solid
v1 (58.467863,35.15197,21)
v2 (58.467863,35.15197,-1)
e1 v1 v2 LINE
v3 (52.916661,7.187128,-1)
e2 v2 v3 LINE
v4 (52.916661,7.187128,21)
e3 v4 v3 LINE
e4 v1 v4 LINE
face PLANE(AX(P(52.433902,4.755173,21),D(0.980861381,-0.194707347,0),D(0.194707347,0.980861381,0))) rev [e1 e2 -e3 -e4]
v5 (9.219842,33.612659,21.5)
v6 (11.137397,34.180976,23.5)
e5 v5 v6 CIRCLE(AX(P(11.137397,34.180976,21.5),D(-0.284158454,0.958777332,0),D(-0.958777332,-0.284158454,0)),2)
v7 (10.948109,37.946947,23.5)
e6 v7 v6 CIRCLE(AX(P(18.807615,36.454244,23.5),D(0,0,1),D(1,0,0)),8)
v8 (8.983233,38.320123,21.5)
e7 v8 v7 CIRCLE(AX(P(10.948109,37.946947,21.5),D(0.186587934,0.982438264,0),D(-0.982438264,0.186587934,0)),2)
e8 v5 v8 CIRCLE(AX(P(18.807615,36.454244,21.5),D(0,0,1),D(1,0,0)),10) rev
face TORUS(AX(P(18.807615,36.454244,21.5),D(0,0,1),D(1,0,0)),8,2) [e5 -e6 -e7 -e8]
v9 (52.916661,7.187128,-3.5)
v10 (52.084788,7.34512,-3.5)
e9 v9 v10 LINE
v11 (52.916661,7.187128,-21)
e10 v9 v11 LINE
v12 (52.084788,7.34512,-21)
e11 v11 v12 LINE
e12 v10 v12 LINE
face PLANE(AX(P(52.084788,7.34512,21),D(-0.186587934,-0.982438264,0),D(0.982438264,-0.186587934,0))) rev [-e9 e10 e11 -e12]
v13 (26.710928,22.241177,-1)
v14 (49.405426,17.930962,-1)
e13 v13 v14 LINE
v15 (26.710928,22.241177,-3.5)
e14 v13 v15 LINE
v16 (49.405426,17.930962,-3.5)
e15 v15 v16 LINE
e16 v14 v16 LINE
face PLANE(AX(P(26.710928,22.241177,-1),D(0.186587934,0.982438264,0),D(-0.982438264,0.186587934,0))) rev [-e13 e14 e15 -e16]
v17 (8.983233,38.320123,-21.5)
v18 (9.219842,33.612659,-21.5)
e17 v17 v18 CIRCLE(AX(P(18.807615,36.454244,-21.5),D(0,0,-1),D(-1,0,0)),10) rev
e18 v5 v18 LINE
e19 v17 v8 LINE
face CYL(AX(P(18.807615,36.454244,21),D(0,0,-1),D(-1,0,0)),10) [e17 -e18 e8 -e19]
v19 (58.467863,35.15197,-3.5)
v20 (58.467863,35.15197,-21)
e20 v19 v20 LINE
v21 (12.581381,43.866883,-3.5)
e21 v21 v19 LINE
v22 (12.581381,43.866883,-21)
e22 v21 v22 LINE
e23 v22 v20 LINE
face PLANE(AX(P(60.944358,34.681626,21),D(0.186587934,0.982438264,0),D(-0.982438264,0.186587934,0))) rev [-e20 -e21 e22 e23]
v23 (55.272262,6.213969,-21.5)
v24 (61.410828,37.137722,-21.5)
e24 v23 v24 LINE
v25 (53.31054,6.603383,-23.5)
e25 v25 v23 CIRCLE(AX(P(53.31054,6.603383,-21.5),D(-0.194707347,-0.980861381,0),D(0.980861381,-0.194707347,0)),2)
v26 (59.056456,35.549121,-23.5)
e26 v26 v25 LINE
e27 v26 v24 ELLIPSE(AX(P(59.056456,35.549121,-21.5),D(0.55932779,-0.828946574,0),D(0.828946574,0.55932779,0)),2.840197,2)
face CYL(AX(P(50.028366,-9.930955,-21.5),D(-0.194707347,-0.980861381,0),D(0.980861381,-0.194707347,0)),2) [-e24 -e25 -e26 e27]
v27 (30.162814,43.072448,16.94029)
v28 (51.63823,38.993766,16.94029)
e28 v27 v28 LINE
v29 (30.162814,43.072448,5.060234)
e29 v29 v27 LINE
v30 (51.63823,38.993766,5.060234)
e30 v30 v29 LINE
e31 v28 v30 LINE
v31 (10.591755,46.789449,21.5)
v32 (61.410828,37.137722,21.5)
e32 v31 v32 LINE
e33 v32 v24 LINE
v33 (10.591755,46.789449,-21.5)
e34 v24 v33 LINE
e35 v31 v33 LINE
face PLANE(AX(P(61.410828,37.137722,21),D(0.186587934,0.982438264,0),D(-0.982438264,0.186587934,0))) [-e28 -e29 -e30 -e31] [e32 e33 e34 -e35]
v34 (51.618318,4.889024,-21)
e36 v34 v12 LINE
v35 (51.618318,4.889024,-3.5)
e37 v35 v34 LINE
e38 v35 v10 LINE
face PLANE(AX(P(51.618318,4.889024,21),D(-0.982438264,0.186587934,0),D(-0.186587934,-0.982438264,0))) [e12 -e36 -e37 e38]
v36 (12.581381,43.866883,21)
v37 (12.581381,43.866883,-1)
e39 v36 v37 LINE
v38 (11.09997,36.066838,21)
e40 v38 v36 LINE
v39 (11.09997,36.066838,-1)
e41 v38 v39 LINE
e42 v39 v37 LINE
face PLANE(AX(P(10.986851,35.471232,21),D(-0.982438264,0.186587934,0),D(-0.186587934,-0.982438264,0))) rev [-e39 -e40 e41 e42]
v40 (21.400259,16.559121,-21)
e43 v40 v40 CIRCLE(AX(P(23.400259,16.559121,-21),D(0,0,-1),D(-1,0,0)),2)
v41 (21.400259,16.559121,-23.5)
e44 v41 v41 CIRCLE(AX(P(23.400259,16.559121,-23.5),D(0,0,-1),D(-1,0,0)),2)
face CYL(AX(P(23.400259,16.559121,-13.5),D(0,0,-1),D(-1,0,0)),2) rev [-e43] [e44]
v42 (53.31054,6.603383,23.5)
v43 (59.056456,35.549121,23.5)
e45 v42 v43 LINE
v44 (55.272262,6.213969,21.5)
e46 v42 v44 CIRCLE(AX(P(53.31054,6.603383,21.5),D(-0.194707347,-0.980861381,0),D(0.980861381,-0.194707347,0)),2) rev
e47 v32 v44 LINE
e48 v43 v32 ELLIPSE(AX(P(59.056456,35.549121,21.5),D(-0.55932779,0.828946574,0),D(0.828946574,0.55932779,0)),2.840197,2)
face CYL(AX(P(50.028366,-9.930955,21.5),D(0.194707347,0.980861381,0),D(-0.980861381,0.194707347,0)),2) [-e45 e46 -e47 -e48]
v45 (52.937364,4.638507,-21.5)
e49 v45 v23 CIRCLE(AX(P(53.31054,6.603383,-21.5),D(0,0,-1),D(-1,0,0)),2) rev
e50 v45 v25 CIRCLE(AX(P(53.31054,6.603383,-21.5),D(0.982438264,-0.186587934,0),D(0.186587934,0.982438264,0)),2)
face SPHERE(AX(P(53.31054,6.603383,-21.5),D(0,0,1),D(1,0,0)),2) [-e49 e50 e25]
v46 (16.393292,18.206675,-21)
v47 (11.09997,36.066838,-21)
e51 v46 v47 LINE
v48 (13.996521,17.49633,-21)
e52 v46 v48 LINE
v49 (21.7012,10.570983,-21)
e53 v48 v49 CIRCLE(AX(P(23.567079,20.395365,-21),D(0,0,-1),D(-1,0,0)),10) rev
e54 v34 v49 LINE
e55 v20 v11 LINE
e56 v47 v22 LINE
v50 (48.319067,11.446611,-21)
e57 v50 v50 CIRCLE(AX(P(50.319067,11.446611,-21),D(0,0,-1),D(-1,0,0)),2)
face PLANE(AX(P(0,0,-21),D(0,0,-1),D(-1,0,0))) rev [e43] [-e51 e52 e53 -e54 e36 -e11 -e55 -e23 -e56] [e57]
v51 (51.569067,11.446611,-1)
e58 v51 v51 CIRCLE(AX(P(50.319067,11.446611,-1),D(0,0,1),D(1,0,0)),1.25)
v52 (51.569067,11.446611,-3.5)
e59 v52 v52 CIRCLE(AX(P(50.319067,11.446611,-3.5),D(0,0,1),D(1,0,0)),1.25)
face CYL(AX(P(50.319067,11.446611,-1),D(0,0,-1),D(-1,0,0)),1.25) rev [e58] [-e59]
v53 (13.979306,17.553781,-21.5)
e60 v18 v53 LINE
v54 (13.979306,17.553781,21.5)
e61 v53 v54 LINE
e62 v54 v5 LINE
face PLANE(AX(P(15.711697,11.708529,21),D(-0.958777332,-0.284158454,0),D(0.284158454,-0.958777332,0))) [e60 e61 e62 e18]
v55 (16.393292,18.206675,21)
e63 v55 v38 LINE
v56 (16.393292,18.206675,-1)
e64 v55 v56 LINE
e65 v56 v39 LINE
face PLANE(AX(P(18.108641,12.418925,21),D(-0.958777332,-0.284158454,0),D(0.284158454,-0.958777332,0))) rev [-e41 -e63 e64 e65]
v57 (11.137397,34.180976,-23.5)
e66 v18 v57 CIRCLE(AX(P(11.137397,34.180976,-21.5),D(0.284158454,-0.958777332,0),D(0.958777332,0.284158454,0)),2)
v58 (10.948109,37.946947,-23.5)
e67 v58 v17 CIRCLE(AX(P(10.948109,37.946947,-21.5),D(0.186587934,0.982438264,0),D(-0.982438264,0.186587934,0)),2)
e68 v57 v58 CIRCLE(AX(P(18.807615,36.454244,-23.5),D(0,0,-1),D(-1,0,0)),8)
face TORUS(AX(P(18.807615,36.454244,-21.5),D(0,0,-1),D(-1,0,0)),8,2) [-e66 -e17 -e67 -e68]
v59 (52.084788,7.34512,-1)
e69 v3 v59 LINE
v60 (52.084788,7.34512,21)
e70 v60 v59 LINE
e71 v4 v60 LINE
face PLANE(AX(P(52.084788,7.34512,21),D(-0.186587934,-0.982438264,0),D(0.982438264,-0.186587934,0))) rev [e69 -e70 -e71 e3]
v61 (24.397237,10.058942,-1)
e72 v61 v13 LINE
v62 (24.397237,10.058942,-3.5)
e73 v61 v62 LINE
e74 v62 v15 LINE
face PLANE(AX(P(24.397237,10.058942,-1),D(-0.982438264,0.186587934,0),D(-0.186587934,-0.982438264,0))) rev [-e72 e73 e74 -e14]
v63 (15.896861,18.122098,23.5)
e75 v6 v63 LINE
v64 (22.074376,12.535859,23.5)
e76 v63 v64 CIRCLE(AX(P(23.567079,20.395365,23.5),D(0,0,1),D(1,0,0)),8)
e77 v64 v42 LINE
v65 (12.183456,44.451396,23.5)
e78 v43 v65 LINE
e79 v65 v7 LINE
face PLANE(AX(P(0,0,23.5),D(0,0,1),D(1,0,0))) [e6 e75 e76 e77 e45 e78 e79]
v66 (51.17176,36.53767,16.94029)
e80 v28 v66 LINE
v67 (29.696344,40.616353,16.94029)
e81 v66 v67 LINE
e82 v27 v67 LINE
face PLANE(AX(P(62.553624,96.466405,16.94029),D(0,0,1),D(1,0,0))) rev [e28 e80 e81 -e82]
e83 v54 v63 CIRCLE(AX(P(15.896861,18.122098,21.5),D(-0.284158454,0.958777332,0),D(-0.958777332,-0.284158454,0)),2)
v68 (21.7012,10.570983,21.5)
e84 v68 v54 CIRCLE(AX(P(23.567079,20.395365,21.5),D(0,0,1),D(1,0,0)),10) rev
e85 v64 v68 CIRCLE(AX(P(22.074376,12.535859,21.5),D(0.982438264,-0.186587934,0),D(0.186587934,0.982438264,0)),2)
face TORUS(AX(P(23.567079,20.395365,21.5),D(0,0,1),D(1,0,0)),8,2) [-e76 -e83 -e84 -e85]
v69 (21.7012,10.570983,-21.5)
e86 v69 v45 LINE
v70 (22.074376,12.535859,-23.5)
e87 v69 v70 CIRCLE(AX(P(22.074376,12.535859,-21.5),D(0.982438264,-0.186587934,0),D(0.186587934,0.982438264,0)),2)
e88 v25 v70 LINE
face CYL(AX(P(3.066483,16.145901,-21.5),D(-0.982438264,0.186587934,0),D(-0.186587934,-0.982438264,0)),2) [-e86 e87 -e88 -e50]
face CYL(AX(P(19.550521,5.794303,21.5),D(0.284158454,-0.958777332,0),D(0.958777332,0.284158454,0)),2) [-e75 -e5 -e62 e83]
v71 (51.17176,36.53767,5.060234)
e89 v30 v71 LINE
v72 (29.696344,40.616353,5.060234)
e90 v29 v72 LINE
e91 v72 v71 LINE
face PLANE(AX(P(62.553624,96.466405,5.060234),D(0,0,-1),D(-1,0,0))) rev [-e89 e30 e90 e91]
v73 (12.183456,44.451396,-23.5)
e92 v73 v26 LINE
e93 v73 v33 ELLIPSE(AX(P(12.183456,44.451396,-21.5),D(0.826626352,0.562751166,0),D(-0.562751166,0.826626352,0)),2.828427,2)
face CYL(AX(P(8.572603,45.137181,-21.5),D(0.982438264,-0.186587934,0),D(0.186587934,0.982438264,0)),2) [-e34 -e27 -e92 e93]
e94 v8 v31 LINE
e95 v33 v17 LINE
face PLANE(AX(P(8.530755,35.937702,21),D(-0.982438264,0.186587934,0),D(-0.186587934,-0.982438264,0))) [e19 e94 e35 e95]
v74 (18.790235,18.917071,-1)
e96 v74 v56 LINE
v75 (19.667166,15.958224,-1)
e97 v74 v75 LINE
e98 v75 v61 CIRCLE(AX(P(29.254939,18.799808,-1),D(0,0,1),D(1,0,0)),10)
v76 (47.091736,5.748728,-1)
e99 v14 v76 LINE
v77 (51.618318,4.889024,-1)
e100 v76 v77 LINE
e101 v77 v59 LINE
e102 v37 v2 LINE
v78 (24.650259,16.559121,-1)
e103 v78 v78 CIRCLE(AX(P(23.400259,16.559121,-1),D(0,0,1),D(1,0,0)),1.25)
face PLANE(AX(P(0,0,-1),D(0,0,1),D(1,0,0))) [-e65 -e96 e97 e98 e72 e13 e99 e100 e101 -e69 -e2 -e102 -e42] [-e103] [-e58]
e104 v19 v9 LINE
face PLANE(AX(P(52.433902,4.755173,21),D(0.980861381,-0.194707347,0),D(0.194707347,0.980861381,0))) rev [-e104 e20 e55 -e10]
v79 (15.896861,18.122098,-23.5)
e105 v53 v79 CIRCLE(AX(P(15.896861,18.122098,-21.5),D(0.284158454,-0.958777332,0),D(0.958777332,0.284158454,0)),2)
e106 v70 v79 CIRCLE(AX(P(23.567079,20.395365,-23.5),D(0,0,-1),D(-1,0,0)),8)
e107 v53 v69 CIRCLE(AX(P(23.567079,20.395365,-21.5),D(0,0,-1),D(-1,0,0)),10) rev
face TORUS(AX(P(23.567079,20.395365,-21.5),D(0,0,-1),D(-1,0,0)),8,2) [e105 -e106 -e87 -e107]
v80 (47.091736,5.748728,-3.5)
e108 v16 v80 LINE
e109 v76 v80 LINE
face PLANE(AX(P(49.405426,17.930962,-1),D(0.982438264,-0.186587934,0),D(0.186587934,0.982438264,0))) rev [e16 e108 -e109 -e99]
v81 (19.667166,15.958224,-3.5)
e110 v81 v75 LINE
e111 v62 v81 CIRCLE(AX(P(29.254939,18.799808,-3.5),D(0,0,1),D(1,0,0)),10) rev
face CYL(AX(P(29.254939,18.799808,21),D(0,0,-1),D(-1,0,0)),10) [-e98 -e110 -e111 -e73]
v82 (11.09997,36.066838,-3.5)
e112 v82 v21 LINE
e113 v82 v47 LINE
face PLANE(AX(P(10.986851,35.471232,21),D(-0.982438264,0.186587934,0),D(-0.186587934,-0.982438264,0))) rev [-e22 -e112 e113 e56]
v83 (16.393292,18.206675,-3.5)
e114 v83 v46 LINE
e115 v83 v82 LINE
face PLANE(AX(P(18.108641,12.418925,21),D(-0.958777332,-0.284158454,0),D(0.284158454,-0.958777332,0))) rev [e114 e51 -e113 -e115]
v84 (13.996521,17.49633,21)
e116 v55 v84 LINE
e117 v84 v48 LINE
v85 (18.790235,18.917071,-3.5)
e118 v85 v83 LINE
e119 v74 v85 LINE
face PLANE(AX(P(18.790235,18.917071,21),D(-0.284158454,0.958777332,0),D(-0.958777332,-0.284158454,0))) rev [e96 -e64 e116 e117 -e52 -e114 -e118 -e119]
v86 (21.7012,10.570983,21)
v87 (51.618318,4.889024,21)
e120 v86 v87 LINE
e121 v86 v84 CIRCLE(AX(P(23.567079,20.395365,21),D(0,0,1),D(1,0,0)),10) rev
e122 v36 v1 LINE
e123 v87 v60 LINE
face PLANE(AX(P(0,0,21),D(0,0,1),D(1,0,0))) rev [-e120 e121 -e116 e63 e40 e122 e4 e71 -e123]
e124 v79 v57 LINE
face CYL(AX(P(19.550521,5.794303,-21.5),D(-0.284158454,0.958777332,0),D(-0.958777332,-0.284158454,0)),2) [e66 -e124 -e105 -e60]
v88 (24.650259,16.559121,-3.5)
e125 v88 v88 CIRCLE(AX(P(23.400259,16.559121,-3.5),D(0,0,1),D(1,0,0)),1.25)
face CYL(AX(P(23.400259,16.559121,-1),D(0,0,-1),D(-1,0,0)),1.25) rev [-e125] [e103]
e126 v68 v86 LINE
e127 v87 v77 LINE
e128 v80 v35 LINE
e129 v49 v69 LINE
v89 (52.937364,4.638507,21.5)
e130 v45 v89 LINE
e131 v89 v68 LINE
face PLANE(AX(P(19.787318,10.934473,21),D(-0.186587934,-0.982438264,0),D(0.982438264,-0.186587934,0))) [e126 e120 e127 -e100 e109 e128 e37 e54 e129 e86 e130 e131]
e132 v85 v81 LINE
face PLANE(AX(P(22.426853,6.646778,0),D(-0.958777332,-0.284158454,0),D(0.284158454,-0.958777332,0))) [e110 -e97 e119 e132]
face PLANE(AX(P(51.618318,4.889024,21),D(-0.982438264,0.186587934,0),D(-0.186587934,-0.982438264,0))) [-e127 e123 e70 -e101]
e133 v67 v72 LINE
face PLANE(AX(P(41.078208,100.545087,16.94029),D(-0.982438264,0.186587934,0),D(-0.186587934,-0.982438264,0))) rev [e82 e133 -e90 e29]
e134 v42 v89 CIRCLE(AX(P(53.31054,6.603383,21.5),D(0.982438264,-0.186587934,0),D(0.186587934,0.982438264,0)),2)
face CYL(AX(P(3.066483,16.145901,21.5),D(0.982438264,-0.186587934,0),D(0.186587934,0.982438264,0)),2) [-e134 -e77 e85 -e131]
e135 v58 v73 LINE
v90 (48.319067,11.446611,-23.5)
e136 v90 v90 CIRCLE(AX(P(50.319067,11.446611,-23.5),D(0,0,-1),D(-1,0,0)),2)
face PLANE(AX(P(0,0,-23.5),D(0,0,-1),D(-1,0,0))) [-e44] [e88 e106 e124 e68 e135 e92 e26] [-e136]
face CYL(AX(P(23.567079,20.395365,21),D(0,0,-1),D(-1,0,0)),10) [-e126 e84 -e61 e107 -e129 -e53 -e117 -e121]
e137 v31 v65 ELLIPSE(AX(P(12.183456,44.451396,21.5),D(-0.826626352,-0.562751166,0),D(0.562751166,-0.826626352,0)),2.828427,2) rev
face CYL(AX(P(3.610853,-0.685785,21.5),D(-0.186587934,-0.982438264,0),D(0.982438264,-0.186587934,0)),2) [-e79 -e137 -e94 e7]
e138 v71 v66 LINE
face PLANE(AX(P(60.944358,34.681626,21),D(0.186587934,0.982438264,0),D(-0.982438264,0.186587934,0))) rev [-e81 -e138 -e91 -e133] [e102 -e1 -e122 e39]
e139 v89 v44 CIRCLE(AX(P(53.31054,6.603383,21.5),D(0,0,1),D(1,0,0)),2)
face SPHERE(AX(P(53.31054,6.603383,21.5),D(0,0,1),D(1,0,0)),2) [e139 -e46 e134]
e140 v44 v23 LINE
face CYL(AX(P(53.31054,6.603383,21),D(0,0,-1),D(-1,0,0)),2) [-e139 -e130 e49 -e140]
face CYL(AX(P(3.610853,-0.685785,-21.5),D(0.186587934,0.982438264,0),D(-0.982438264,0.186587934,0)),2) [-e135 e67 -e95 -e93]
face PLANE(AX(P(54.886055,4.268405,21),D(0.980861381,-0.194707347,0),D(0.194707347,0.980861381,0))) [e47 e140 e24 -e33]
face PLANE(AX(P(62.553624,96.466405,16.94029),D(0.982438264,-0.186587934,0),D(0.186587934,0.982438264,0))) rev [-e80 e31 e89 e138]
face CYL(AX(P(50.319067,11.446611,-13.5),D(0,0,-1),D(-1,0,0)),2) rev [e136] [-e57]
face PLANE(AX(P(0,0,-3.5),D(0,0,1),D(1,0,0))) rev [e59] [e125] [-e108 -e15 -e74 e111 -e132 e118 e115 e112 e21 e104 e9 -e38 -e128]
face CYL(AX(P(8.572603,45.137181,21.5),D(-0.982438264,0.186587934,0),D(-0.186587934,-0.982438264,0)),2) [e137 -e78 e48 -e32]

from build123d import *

# Parameters (mm, degrees)
EXTRUDE_3_DEPTH     = 21
EXTRUDE_1_DEPTH     = 2.5
SKETCH_9_R          = 1.25
EXTRUDE_2_DEPTH     = 2.5
EXTRUDE_3_2_DEPTH   = 2.5
SKETCH_11_W         = 42
SKETCH_11_H         = 10.406253358
CUT_EXTRUDE_1_DEPTH = 5
FILLET_1_R          = 10
FILLET_2_R          = 2
SKETCH_12_W         = 21.859303669
SKETCH_12_H         = 11.880056341
CUT_EXTRUDE_2_DEPTH = 61
SKETCH_14_R         = 2
CUT_EXTRUDE_3_DEPTH = 10


with BuildPart() as part:
    # 草图7 → Extrude 3 (new, symmetric)
    with BuildSketch(Plane.XY):
        Polygon((51.618317891, 4.889024384), (54.886055332, 4.268404852), (61.410827986, 37.137721863), (10.591755085, 46.789448736), (8.530755399, 35.937702238), (15.711697443, 11.708528829), (19.787318129, 10.93447343), (20.253787963, 13.390569091), (17.675542885, 13.880237947), (11.09997038, 36.066837632), (12.581380912, 43.866883241), (58.467863291, 35.15197032), (52.916660674, 7.187127975), (52.084787725, 7.345120045), align=None)
    extrude(amount=EXTRUDE_3_DEPTH, both=True)

    # 草图8 → 凸台-拉伸1 (add)
    with BuildSketch(Plane.XY.offset(21)):
        Polygon((58.467863291, 35.15197032), (52.916660674, 7.187127975), (52.084787725, 7.345120045), (51.618317891, 4.889024384), (54.886055332, 4.268404852), (61.410827986, 37.137721863), (10.591755085, 46.789448736), (8.530755399, 35.937702238), (15.711697443, 11.708528829), (19.787318129, 10.93447343), (20.253787963, 13.390569091), (17.675542885, 13.880237947), (11.09997038, 36.066837632), (12.581380912, 43.866883241), align=None)
        Polygon((19.787318129, 10.93447343), (51.618317891, 4.889024384), (52.084787725, 7.345120045), (52.916660674, 7.187127975), (58.467863291, 35.15197032), (12.581380912, 43.866883241), (11.09997038, 36.066837632), (17.675542885, 13.880237947), (20.253787963, 13.390569091), align=None)
    extrude(amount=EXTRUDE_1_DEPTH)

    # 草图9 → 凸台-拉伸2 (add)
    with BuildSketch(Plane.XY.offset(-3.5)):
        Polygon((24.397237371, 10.058942279), (26.710927747, 22.241176755), (49.405425881, 17.930962401), (47.091735505, 5.748727924), (54.886055332, 4.268404852), (61.410827986, 37.137721863), (10.591755085, 46.789448736), (8.530755399, 35.937702238), (15.711697443, 11.708528829), align=None)
        with Locations((23.400258978, 16.559120835)):
            Circle(SKETCH_9_R, mode=Mode.SUBTRACT)
        with Locations((50.319067418, 11.446611456)):
            Circle(SKETCH_9_R, mode=Mode.SUBTRACT)
    extrude(amount=EXTRUDE_2_DEPTH)

    # 草图10 → Extrude 3 2 (add)
    with BuildSketch(Plane(origin=(0, 0, -21), x_dir=(-1, 0, 0), z_dir=(0, 0, -1))):
        Polygon((-15.711697443, 11.708528829), (-8.530755399, 35.937702238), (-10.591755085, 46.789448736), (-61.410827986, 37.137721863), (-54.886055332, 4.268404852), align=None)
    extrude(amount=EXTRUDE_3_2_DEPTH)

    # 草图11 → 切除-拉伸1 (cut)
    with BuildSketch(Plane(origin=(17.63296674, 5.225985637, 0), x_dir=(0, 0, 1), z_dir=(-0.9587773323568242, -0.28415845396315786, 0))):
        with Locations((0, 7.59472781)):
            Rectangle(SKETCH_11_W, SKETCH_11_H)
    extrude(amount=-CUT_EXTRUDE_1_DEPTH, mode=Mode.SUBTRACT)

    # 圆角1
    # the kernel refuses this fillet: 10 mm, written as the material it takes off along each edge
    with BuildSketch(Plane(origin=(15.711697443, 11.708528829, -5.758578091), x_dir=(0.9824382642502659, -0.18658793352445072, 0), z_dir=(0, 0, -1)), Plane(origin=(15.711697443, 11.708528829, 38.741421909), x_dir=(0.9824382642502659, -0.18658793352445072, 0), z_dir=(0, 0, -1))) as fillet_1_piece_1:
        with BuildLine():
            CenterArc((FILLET_1_R * 0.609656876359, -FILLET_1_R), FILLET_1_R, 90, 62.737721614)
            Line((-FILLET_1_R * 0.279262123126, -FILLET_1_R * 0.541935580562), (0, 0))
            Line((0, 0), (FILLET_1_R * 0.609656876359, 0))
        make_face()
    extrude(amount=32.982843818, mode=Mode.SUBTRACT)
    with BuildSketch(Plane(origin=(21.237725488, 10.659007254, -17.317640641), x_dir=(0.9824382642502885, -0.18658793352433115, 0), z_dir=(0, 0, 1))) as fillet_1_piece_2:
        with BuildLine():
            CenterArc((6.357442179, 9.493749512), FILLET_1_R, 207.262278386, 44.428504043)
            Line((-2.531747815, 4.913105318), (0, 0))
            Line((0, 0), (3.215990254, 0))
        make_face()
    extrude(amount=30.135281283, mode=Mode.SUBTRACT)
    with BuildSketch(Plane(origin=(8.530755399, 35.937702238, 29.562520674), x_dir=(0.18658793352445296, 0.9824382642502654, 0), z_dir=(0, 0, -1))) as fillet_1_piece_3:
        with BuildLine():
            CenterArc((FILLET_1_R * 0.242500826961, FILLET_1_R), FILLET_1_R, 242.737721614, 27.262278386)
            Line((-FILLET_1_R * 0.215563592477, FILLET_1_R * 0.111081000515), (0, 0))
            Line((0, 0), (FILLET_1_R * 0.242500826961, 0))
        make_face()
    extrude(amount=59.125041348, mode=Mode.SUBTRACT)

    # 圆角2
    fillet_2_edges = [part.edges().sort_by_distance(p)[0] for p in [
        (36.001291535, 41.963585299, -23.5),
        (58.148441659, 20.703063357, -23.5),
        (38.293627604, 7.419693757, -23.5),
        (11.599573944, 25.583220021, 23.5),
        (11.599573944, 25.583220021, -23.5),
        (9.787493883, 42.554785944, -23.5),
        (16.859888508, 12.978250443, -23.5),
        (8.820223079, 35.952251632, -23.5),
        (38.293627604, 7.419693757, 23.5),
        (16.859888508, 12.978250443, 23.5),
        (8.820223079, 35.952251632, 23.5),
        (54.886055332, 4.268404852, 0),
        (58.148441659, 20.703063357, 23.5),
        (36.001291535, 41.963585299, 23.5),
        (9.787493883, 42.554785944, 23.5),
    ]]
    fillet(fillet_2_edges, radius=FILLET_2_R)

    # 草图12 → 切除-拉伸2 (cut)
    with BuildSketch(Plane(origin=(8.479309234, 44.645962299, 0), x_dir=(0.9824382642502656, -0.18658793352445194, 0), z_dir=(-0.18658793352445194, -0.9824382642502656, 0))):
        with Locations((32.525954901, 11.00026169)):
            Rectangle(SKETCH_12_W, SKETCH_12_H)
    extrude(amount=-CUT_EXTRUDE_2_DEPTH, mode=Mode.SUBTRACT)

    # 草图14 → 切除-拉伸3 (cut)
    with BuildSketch(Plane(origin=(0, 0, -23.5), x_dir=(-1, 0, 0), z_dir=(0, 0, -1))):
        with Locations((-50.319067418, 11.446611456)):
            Circle(SKETCH_14_R)
        with Locations((-23.400258978, 16.559120835)):
            Circle(SKETCH_14_R)
    extrude(amount=-CUT_EXTRUDE_3_DEPTH, mode=Mode.SUBTRACT)


solid = part.part
